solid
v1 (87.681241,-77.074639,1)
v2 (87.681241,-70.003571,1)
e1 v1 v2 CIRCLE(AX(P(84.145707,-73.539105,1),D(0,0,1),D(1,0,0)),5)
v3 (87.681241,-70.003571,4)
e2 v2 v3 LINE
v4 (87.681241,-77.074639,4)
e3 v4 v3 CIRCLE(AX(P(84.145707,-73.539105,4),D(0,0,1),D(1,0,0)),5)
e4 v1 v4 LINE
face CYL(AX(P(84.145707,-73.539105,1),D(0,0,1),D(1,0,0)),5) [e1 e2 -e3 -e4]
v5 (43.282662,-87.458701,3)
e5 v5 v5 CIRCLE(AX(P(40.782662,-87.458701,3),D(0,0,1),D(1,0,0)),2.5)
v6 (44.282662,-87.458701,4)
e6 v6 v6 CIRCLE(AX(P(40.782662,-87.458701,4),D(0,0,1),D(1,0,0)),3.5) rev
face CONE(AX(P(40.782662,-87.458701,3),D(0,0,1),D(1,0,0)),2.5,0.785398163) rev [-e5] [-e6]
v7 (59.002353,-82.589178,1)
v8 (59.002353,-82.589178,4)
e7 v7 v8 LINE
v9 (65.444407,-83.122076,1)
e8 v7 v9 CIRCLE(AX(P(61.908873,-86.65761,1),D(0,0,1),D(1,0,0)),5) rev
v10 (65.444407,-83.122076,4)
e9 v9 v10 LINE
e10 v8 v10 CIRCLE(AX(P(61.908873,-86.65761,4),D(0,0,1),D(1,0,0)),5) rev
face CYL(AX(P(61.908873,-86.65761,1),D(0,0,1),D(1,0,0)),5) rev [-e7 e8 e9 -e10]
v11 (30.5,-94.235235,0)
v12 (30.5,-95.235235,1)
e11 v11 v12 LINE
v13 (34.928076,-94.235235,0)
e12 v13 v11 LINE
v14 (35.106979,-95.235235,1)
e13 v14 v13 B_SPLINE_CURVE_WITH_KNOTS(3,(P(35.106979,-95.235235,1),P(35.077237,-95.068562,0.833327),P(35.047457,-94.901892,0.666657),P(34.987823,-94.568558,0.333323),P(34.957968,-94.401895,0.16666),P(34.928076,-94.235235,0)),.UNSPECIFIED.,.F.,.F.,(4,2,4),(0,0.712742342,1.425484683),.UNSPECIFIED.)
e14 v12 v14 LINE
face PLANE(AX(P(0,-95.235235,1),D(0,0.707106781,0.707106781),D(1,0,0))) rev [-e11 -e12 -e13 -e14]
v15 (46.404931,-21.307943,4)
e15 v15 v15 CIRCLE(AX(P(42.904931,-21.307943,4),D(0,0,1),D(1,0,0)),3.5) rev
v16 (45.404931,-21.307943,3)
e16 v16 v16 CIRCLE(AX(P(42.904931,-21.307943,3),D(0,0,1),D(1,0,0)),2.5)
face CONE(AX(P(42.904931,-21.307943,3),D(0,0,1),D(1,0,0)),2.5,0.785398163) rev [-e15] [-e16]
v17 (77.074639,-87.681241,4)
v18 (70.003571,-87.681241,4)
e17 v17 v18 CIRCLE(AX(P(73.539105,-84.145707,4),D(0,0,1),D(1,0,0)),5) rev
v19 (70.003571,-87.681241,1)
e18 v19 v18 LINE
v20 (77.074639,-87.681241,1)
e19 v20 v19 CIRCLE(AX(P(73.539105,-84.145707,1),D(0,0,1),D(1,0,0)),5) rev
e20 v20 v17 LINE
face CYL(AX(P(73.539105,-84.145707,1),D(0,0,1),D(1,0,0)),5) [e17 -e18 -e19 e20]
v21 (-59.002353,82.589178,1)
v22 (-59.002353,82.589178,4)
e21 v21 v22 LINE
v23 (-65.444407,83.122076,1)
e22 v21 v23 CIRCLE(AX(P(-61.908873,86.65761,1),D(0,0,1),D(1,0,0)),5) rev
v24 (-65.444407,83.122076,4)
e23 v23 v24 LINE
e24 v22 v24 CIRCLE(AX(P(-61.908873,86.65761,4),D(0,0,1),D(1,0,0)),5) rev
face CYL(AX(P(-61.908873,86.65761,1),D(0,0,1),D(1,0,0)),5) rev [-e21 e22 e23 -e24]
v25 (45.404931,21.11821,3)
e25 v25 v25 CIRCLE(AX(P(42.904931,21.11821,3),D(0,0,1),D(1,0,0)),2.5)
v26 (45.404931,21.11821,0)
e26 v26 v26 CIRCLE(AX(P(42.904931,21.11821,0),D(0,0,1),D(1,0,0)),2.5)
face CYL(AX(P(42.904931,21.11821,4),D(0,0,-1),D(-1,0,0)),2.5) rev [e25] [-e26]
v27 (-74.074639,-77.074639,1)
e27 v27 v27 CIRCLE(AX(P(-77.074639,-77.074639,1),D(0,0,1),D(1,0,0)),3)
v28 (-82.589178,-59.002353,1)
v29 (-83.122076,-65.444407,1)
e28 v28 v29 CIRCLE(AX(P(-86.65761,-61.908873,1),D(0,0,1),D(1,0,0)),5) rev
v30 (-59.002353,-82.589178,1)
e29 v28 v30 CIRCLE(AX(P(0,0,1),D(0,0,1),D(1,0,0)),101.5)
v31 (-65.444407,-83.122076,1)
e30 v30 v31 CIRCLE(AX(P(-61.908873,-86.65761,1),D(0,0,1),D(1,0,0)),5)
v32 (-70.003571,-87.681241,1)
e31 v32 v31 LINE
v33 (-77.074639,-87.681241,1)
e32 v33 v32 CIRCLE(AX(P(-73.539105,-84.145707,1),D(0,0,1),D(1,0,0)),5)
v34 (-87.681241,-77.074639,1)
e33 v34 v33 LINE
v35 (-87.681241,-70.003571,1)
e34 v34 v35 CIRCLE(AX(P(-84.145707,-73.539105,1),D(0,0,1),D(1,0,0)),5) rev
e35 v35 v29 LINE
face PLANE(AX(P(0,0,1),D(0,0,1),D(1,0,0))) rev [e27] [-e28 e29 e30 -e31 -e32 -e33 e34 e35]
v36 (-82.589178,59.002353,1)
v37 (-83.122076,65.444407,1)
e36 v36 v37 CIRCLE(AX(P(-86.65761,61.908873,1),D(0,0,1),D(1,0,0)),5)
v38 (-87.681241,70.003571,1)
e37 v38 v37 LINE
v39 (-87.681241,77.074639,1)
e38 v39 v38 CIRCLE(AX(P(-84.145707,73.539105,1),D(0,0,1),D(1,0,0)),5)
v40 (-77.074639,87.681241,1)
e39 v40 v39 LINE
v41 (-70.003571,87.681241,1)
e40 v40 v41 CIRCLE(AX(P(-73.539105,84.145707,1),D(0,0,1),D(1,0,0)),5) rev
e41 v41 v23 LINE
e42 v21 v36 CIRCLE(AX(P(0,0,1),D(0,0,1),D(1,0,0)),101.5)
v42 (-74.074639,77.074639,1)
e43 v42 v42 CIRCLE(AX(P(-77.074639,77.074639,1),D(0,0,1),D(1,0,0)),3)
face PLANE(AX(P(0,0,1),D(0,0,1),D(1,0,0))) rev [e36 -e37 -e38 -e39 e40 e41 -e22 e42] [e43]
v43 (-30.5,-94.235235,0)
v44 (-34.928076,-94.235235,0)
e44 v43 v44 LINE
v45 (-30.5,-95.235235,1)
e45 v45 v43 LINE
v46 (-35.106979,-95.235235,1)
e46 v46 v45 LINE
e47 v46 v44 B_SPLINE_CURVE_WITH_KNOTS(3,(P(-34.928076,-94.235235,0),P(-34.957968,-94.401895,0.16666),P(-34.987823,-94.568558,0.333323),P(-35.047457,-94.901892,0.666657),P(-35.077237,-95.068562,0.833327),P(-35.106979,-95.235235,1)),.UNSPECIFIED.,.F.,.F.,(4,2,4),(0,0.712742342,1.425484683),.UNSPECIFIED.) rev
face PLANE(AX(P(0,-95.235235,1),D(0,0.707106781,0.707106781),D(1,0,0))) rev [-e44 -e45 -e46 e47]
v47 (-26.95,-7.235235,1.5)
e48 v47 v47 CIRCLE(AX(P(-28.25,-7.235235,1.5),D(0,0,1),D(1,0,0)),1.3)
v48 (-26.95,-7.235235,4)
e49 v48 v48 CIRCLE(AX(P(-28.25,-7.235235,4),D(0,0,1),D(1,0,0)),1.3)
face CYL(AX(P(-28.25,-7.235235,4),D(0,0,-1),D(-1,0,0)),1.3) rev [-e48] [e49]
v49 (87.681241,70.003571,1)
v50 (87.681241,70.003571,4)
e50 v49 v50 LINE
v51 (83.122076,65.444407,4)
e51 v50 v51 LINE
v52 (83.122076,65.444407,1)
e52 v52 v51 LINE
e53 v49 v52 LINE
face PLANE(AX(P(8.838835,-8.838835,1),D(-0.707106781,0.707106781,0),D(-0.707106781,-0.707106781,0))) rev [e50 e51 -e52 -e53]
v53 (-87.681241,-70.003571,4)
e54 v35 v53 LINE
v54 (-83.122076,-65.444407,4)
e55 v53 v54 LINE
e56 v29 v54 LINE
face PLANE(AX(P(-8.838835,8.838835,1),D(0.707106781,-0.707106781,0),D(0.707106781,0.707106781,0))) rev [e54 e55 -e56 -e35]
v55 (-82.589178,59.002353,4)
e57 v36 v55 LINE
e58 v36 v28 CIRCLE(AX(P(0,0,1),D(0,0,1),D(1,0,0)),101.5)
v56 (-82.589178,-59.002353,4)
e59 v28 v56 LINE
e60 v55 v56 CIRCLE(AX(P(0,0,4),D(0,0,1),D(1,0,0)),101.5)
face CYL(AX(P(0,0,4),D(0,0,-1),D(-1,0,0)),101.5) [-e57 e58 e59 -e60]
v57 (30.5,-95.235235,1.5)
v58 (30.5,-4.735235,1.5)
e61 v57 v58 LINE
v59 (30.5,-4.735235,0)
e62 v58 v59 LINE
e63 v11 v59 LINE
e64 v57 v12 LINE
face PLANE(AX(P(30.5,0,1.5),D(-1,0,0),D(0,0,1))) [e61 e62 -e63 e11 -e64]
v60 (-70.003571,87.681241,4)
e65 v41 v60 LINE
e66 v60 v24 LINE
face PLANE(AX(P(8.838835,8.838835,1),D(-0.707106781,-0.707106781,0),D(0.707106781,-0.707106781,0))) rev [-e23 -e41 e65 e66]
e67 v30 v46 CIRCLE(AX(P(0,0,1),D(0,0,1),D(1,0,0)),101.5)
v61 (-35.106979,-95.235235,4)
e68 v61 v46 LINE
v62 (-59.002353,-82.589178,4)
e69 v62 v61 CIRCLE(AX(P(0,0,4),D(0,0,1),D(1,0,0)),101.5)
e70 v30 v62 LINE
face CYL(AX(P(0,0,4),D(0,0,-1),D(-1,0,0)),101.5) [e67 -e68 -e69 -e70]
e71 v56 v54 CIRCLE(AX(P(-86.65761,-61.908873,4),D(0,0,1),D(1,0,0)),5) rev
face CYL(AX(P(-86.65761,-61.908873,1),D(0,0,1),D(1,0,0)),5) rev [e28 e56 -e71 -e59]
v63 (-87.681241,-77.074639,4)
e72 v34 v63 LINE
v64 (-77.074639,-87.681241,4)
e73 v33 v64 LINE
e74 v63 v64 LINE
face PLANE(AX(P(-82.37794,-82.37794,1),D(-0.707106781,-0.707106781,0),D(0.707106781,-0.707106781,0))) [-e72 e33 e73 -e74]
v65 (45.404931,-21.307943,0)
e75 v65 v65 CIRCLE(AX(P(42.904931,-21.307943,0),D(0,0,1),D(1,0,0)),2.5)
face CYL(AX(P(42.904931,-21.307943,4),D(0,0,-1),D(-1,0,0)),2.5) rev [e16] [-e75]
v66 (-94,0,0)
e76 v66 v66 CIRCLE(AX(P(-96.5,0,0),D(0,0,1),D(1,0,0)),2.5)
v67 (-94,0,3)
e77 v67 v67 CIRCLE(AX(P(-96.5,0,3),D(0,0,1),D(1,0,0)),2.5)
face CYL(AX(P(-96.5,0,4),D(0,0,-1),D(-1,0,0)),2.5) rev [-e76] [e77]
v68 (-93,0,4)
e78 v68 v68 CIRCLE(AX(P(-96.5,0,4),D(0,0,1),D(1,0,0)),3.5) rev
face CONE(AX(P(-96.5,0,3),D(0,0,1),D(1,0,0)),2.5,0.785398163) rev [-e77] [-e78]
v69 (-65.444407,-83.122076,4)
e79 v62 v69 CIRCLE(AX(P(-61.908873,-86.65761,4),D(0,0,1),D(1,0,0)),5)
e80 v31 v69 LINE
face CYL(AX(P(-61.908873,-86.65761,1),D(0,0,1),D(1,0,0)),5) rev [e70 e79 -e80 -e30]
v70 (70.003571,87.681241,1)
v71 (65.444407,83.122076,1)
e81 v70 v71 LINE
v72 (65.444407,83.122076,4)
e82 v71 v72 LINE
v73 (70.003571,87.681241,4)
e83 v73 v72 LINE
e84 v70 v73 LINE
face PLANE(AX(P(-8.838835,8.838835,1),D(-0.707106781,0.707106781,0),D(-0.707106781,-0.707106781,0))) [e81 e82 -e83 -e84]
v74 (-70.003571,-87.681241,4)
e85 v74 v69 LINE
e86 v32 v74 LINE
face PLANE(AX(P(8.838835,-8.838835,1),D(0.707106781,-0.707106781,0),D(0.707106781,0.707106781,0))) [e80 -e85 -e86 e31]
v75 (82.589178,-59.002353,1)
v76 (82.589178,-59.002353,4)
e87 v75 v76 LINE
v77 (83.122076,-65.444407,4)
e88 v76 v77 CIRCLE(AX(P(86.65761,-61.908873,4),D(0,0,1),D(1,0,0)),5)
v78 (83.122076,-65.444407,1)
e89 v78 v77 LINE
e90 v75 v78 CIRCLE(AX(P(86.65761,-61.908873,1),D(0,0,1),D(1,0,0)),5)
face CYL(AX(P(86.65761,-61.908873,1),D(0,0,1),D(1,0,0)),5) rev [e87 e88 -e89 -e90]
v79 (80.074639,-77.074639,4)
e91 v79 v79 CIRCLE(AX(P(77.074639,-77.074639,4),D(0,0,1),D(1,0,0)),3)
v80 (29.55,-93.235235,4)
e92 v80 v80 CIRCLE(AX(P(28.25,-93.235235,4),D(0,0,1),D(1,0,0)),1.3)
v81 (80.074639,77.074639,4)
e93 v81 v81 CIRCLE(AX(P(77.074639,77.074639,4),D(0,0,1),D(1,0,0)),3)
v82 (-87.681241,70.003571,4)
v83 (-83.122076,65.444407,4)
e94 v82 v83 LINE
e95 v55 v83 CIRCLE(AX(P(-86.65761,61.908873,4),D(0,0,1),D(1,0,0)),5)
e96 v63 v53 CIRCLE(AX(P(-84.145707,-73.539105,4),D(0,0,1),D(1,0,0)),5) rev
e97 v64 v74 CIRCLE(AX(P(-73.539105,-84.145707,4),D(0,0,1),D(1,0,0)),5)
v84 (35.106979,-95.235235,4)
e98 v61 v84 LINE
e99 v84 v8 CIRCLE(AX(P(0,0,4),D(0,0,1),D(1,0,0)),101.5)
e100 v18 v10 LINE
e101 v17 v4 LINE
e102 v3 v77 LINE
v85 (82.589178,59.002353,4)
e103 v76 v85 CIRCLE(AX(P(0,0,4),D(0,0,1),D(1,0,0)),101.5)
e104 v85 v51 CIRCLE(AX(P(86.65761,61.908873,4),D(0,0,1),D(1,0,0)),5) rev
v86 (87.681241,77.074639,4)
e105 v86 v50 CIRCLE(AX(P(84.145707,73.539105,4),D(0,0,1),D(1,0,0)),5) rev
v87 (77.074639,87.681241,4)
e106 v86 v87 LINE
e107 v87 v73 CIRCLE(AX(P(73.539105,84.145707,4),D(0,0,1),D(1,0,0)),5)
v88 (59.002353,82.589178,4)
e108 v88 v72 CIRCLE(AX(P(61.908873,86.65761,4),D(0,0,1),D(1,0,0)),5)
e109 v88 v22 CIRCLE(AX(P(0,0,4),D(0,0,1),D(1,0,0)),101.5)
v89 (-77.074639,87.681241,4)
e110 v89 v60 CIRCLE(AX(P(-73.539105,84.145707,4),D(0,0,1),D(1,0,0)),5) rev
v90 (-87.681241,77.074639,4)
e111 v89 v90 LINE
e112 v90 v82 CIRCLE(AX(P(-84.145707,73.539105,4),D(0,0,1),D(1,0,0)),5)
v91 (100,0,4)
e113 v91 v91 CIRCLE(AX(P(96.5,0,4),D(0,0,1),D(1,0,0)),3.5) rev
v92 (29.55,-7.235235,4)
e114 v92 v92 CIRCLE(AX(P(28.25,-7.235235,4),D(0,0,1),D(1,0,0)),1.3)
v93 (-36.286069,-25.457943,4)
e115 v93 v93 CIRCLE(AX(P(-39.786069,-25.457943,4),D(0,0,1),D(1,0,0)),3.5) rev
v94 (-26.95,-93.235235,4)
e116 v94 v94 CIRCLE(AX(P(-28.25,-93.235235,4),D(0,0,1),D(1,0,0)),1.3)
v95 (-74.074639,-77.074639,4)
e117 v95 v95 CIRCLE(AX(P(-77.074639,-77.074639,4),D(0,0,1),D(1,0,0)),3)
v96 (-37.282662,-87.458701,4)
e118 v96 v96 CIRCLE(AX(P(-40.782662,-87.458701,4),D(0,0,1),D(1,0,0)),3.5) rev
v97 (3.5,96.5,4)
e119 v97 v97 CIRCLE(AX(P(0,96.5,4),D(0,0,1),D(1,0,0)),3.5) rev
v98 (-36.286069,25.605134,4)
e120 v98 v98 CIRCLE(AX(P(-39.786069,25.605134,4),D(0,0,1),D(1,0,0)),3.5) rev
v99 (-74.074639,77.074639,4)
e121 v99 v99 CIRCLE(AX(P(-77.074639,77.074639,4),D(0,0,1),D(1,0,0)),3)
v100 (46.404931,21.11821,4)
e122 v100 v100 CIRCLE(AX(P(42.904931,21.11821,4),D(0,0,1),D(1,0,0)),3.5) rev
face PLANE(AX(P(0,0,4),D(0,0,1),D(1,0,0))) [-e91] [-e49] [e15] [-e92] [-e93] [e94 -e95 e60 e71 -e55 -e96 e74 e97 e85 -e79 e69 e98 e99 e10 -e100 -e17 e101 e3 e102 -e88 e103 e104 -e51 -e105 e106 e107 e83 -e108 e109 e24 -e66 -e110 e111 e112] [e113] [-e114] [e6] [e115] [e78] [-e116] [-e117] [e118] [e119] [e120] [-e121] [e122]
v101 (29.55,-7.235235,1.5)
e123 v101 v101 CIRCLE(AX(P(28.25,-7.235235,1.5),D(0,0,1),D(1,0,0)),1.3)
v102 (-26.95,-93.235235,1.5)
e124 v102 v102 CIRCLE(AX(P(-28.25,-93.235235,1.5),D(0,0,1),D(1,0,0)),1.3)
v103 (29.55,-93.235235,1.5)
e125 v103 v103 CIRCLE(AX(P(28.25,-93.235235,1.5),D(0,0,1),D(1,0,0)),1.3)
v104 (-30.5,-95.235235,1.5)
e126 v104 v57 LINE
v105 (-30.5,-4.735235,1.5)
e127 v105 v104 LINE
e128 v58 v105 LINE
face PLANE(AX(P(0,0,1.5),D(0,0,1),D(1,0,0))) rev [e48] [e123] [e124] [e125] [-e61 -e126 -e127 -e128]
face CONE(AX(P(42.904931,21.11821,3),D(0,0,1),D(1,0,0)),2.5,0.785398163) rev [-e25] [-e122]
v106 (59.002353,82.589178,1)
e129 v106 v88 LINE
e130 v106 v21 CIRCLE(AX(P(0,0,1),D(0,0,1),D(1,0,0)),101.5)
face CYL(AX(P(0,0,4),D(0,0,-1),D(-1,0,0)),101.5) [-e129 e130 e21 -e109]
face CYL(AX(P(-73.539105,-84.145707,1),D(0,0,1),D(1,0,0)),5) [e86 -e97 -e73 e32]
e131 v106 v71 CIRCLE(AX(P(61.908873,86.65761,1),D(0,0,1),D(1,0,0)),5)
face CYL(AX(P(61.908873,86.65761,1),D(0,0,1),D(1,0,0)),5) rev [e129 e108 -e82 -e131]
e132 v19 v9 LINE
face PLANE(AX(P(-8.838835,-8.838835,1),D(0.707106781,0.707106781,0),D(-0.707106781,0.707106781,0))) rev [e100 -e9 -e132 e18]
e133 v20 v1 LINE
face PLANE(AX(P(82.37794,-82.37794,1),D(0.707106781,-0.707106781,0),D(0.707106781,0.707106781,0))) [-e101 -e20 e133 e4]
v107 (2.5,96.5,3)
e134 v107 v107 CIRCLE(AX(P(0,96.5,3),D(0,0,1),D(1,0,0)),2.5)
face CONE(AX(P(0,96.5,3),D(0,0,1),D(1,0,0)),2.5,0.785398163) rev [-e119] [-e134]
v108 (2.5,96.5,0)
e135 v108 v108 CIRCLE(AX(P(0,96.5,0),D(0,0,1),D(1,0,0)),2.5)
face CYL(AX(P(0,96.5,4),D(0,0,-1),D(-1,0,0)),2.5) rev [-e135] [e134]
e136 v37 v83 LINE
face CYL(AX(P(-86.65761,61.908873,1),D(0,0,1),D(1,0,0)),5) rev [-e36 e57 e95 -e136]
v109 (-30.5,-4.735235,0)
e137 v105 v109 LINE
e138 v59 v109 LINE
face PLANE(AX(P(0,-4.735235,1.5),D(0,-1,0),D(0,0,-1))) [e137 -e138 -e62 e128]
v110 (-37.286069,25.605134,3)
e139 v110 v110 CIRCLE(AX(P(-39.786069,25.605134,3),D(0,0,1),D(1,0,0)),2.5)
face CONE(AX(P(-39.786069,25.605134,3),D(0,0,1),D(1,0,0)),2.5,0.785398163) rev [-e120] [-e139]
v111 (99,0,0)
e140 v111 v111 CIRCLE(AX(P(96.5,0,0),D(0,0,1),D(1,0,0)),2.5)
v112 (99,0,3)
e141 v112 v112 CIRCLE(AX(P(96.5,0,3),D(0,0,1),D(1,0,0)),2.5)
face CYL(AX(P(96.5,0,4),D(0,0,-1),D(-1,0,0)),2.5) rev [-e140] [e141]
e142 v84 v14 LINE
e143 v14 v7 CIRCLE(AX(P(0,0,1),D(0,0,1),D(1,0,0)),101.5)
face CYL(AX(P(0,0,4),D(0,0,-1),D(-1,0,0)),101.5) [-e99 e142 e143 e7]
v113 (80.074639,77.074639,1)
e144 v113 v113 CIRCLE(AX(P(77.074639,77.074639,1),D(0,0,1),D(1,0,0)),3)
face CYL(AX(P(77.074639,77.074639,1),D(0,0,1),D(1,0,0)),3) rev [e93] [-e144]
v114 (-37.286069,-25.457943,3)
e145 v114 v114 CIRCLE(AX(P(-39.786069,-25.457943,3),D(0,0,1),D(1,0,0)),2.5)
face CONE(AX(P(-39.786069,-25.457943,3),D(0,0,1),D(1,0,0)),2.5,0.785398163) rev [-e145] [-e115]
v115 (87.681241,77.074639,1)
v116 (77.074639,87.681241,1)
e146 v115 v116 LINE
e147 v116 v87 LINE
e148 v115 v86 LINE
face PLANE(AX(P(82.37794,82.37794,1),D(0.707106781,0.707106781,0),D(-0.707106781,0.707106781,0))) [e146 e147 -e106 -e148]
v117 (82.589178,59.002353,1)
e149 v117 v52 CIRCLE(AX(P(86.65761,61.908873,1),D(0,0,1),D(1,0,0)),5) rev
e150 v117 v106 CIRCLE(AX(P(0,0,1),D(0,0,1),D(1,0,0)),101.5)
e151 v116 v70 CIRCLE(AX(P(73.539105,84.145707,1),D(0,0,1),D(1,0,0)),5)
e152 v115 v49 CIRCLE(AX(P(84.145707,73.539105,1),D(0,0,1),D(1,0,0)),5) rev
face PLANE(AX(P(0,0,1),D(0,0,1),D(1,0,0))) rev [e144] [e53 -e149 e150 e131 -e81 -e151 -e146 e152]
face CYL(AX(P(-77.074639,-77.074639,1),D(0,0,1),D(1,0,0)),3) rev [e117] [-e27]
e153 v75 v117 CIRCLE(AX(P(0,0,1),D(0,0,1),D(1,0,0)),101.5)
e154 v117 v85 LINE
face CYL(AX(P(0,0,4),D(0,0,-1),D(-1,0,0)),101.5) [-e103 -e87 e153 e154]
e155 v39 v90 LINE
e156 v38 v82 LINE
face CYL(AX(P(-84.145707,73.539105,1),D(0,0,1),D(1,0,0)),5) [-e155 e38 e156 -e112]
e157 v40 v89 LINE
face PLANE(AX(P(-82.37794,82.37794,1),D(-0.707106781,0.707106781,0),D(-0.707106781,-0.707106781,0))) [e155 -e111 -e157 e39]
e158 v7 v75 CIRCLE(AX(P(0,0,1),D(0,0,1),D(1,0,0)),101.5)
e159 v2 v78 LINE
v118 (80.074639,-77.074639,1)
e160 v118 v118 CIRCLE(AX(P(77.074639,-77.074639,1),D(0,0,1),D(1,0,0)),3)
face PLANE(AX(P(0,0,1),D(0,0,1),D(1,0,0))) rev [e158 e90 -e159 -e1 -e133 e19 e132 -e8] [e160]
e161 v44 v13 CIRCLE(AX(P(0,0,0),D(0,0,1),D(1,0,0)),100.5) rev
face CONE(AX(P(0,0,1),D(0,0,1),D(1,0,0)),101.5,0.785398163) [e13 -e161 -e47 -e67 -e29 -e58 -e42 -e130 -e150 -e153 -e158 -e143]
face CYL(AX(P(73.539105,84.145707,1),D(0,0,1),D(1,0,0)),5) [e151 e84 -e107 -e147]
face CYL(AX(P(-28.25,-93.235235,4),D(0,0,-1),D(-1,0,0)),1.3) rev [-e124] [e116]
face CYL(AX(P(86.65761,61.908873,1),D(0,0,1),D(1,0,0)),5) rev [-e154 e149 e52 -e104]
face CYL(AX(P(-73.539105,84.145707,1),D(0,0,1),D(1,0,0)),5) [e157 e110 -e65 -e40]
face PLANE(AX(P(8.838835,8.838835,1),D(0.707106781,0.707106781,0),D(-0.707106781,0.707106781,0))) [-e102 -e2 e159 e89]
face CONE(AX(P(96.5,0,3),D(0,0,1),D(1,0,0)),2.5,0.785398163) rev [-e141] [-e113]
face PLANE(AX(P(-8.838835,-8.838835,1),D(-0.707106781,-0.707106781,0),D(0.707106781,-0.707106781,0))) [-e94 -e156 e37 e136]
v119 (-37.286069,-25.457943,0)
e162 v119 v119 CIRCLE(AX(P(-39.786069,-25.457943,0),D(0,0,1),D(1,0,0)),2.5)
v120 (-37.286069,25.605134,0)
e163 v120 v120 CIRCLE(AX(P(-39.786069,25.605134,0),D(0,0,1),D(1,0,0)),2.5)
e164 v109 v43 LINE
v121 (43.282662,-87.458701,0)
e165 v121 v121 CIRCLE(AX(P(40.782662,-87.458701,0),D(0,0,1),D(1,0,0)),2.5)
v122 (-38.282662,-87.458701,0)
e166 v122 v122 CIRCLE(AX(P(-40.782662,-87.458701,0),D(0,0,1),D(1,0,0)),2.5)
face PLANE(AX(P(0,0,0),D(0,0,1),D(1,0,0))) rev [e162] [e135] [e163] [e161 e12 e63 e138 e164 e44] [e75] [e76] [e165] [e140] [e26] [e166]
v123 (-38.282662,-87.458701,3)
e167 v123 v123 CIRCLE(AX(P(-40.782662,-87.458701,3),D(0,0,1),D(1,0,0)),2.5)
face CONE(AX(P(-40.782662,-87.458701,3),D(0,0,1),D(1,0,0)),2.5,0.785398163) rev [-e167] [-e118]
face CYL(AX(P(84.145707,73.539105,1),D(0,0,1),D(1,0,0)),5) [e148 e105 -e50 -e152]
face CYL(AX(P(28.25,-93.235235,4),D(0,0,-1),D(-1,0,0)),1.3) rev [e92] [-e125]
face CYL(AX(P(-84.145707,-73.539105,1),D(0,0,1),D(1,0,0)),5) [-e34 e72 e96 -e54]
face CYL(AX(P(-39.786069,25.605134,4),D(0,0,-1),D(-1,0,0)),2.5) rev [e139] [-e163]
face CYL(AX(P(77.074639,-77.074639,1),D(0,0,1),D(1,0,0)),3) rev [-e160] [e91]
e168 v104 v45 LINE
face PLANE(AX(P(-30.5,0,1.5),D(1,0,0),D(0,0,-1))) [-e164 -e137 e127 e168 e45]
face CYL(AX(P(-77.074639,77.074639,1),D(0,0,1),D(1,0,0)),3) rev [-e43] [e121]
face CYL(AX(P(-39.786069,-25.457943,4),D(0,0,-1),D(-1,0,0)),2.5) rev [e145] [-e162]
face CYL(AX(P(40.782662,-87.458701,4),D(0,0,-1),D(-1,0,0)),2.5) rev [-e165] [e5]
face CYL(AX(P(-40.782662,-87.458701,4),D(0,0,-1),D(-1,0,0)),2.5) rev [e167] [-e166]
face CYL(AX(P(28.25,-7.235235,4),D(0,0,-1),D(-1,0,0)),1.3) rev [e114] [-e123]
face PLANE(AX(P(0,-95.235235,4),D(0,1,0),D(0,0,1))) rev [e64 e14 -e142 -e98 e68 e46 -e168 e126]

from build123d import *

# Parameters (mm, degrees)
ESBO_O1_R                = 2.5
ESBO_O1_W                = 61
ESBO_O1_H                = 90.5
ESBO_O1_R_2              = 1.3
RESSALTO_EXTRUS_O1_DEPTH = 4
ESBO_O1_4_W              = 61
ESBO_O1_4_H              = 90.5
ESBO_O1_4_R              = 1.3
CORTE_EXTRUS_O3_DEPTH    = 1.5
RESSALTO_EXTRUS_O3_START = -3
ESBO_O2_R                = 3
RESSALTO_EXTRUS_O3_DEPTH = 3
CHANFRO1_SIZE            = 1
CHANFRO2_SIZE            = 1


with BuildPart() as part:
    # Esboço1 → Ressalto-extrusão1 (new body)
    # profile 1 of 2: a face of its own
    with BuildSketch(Plane.XY):
        with BuildLine():
            Line((-35.106979363, -95.235235076), (-30.5, -95.235235076))
            Line((-30.5, -95.235235076), (-30.5, -4.735235076))
            Line((-30.5, -4.735235076), (30.5, -4.735235076))
            Line((30.5, -4.735235076), (30.5, -95.235235076))
            Line((30.5, -95.235235076), (35.106979363, -95.235235076))
            ThreePointArc((35.106979363, -95.235235076), (0, 101.5), (-35.106979363, -95.235235076))
        make_face()
        with Locations((-40.782662258, -87.458701449)):
            Circle(ESBO_O1_R, mode=Mode.SUBTRACT)
        with Locations((-96.5, 0)):
            Circle(ESBO_O1_R, mode=Mode.SUBTRACT)
        with Locations((-39.78606917, -25.45794308)):
            Circle(ESBO_O1_R, mode=Mode.SUBTRACT)
        with Locations((40.782662258, -87.458701449)):
            Circle(ESBO_O1_R, mode=Mode.SUBTRACT)
        with Locations((42.90493083, -21.30794308)):
            Circle(ESBO_O1_R, mode=Mode.SUBTRACT)
        with Locations((96.5, 0)):
            Circle(ESBO_O1_R, mode=Mode.SUBTRACT)
        with Locations((-39.78606917, 25.605133502)):
            Circle(ESBO_O1_R, mode=Mode.SUBTRACT)
        with Locations((42.90493083, 21.118210084)):
            Circle(ESBO_O1_R, mode=Mode.SUBTRACT)
        with Locations((0, 96.5)):
            Circle(ESBO_O1_R, mode=Mode.SUBTRACT)
    # profile 2 of 2: a face of its own
    with BuildSketch(Plane.XY):
        with Locations((0, -49.985235076)):
            Rectangle(ESBO_O1_W, ESBO_O1_H)
        with Locations((-28.25, -93.235235076)):
            Circle(ESBO_O1_R_2, mode=Mode.SUBTRACT)
        with Locations((-28.25, -7.235235076)):
            Circle(ESBO_O1_R_2, mode=Mode.SUBTRACT)
        with Locations((28.25, -93.235235076)):
            Circle(ESBO_O1_R_2, mode=Mode.SUBTRACT)
        with Locations((28.25, -7.235235076)):
            Circle(ESBO_O1_R_2, mode=Mode.SUBTRACT)
    extrude(amount=RESSALTO_EXTRUS_O1_DEPTH)

    # Esboço1<4> → Corte-extrusão3 (cut)
    with BuildSketch(Plane.XY):
        with Locations((0, -49.985235076)):
            Rectangle(ESBO_O1_4_W, ESBO_O1_4_H)
        with Locations((-28.25, -93.235235076)):
            Circle(ESBO_O1_4_R, mode=Mode.SUBTRACT)
        with Locations((-28.25, -7.235235076)):
            Circle(ESBO_O1_4_R, mode=Mode.SUBTRACT)
        with Locations((28.25, -93.235235076)):
            Circle(ESBO_O1_4_R, mode=Mode.SUBTRACT)
        with Locations((28.25, -7.235235076)):
            Circle(ESBO_O1_4_R, mode=Mode.SUBTRACT)
    extrude(amount=CORTE_EXTRUS_O3_DEPTH, mode=Mode.SUBTRACT)

    # Esboço2 → Ressalto-extrusão3 (add)
    # profile 1 of 4: a face of its own
    with BuildSketch(Plane.XY.offset(4).offset(RESSALTO_EXTRUS_O3_START)):
        with BuildLine():
            ThreePointArc((-59.002353185, -82.589177975), (-71.77133829, -71.77133829), (-82.589177975, -59.002353185))
            ThreePointArc((-82.589177975, -59.002353185), (-81.674630343, -62.321074298), (-83.122076482, -65.444406952))
            Line((-83.122076482, -65.444406952), (-87.681240867, -70.003571337))
            ThreePointArc((-87.681240867, -70.003571337), (-89.145706961, -73.539105243), (-87.681240867, -77.074639149))
            Line((-87.681240867, -77.074639149), (-82.377940008, -82.377940008))
            Line((-82.377940008, -82.377940008), (-77.074639149, -87.681240867))
            ThreePointArc((-77.074639149, -87.681240867), (-73.539105243, -89.145706961), (-70.003571337, -87.681240867))
            Line((-70.003571337, -87.681240867), (-65.444406952, -83.122076482))
            ThreePointArc((-65.444406952, -83.122076482), (-62.321074298, -81.674630343), (-59.002353185, -82.589177975))
        make_face()
        with Locations((-77.074639149, -77.074639149)):
            Circle(ESBO_O2_R, mode=Mode.SUBTRACT)
    # profile 2 of 4: a face of its own
    with BuildSketch(Plane.XY.offset(4).offset(RESSALTO_EXTRUS_O3_START)):
        with BuildLine():
            ThreePointArc((-82.589177975, 59.002353185), (-71.77133829, 71.77133829), (-59.002353185, 82.589177975))
            ThreePointArc((-59.002353185, 82.589177975), (-62.321074298, 81.674630343), (-65.444406952, 83.122076482))
            Line((-65.444406952, 83.122076482), (-70.003571337, 87.681240867))
            ThreePointArc((-70.003571337, 87.681240867), (-73.539105243, 89.145706961), (-77.074639149, 87.681240867))
            Line((-77.074639149, 87.681240867), (-82.377940008, 82.377940008))
            Line((-82.377940008, 82.377940008), (-87.681240867, 77.074639149))
            ThreePointArc((-87.681240867, 77.074639149), (-89.145706961, 73.539105243), (-87.681240867, 70.003571337))
            Line((-87.681240867, 70.003571337), (-83.122076482, 65.444406952))
            ThreePointArc((-83.122076482, 65.444406952), (-81.674630343, 62.321074298), (-82.589177975, 59.002353185))
        make_face()
        with Locations((-77.074639149, 77.074639149)):
            Circle(ESBO_O2_R, mode=Mode.SUBTRACT)
    # profile 3 of 4: a face of its own
    with BuildSketch(Plane.XY.offset(4).offset(RESSALTO_EXTRUS_O3_START)):
        with BuildLine():
            ThreePointArc((59.002353185, 82.589177975), (71.77133829, 71.77133829), (82.589177975, 59.002353185))
            ThreePointArc((82.589177975, 59.002353185), (81.674630343, 62.321074298), (83.122076482, 65.444406952))
            Line((83.122076482, 65.444406952), (87.681240867, 70.003571337))
            ThreePointArc((87.681240867, 70.003571337), (89.145706961, 73.539105243), (87.681240867, 77.074639149))
            Line((87.681240867, 77.074639149), (82.377940008, 82.377940008))
            Line((82.377940008, 82.377940008), (77.074639149, 87.681240867))
            ThreePointArc((77.074639149, 87.681240867), (73.539105243, 89.145706961), (70.003571337, 87.681240867))
            Line((70.003571337, 87.681240867), (65.444406952, 83.122076482))
            ThreePointArc((65.444406952, 83.122076482), (62.321074298, 81.674630343), (59.002353185, 82.589177975))
        make_face()
        with Locations((77.074639149, 77.074639149)):
            Circle(ESBO_O2_R, mode=Mode.SUBTRACT)
    # profile 4 of 4: a face of its own
    with BuildSketch(Plane.XY.offset(4).offset(RESSALTO_EXTRUS_O3_START)):
        with BuildLine():
            Line((77.074639149, -87.681240867), (82.377940008, -82.377940008))
            Line((82.377940008, -82.377940008), (87.681240867, -77.074639149))
            ThreePointArc((87.681240867, -77.074639149), (89.145706961, -73.539105243), (87.681240867, -70.003571337))
            Line((87.681240867, -70.003571337), (83.122076482, -65.444406952))
            ThreePointArc((83.122076482, -65.444406952), (81.674630343, -62.321074298), (82.589177975, -59.002353185))
            ThreePointArc((82.589177975, -59.002353185), (71.77133829, -71.77133829), (59.002353185, -82.589177975))
            ThreePointArc((59.002353185, -82.589177975), (62.321074298, -81.674630343), (65.444406952, -83.122076482))
            Line((65.444406952, -83.122076482), (70.003571337, -87.681240867))
            ThreePointArc((70.003571337, -87.681240867), (73.539105243, -89.145706961), (77.074639149, -87.681240867))
        make_face()
        with Locations((77.074639149, -77.074639149)):
            Circle(ESBO_O2_R, mode=Mode.SUBTRACT)
    extrude(amount=RESSALTO_EXTRUS_O3_DEPTH)

    # Chanfro1
    chanfro1_edges = [part.edges().sort_by_distance(p)[0] for p in [
        (-32.803489682, -95.235235076, 0),
        (0, 101.5, 0),
        (32.803489682, -95.235235076, 0),
    ]]
    chamfer(chanfro1_edges, length=CHANFRO1_SIZE - 0.0001)  # a hair under: the kernel refuses the full size

    # Chanfro2
    chanfro2_edges = [part.edges().sort_by_distance(p)[0] for p in [
        (38.282662258, -87.458701449, 4),
        (40.40493083, -21.30794308, 4),
        (94, 0, 4),
        (40.40493083, 21.118210084, 4),
        (-2.5, 96.5, 4),
        (-42.28606917, 25.605133502, 4),
        (-42.28606917, -25.45794308, 4),
        (-99, 0, 4),
        (-43.282662258, -87.458701449, 4),
    ]]
    chamfer(chanfro2_edges, length=CHANFRO2_SIZE)


solid = part.part
